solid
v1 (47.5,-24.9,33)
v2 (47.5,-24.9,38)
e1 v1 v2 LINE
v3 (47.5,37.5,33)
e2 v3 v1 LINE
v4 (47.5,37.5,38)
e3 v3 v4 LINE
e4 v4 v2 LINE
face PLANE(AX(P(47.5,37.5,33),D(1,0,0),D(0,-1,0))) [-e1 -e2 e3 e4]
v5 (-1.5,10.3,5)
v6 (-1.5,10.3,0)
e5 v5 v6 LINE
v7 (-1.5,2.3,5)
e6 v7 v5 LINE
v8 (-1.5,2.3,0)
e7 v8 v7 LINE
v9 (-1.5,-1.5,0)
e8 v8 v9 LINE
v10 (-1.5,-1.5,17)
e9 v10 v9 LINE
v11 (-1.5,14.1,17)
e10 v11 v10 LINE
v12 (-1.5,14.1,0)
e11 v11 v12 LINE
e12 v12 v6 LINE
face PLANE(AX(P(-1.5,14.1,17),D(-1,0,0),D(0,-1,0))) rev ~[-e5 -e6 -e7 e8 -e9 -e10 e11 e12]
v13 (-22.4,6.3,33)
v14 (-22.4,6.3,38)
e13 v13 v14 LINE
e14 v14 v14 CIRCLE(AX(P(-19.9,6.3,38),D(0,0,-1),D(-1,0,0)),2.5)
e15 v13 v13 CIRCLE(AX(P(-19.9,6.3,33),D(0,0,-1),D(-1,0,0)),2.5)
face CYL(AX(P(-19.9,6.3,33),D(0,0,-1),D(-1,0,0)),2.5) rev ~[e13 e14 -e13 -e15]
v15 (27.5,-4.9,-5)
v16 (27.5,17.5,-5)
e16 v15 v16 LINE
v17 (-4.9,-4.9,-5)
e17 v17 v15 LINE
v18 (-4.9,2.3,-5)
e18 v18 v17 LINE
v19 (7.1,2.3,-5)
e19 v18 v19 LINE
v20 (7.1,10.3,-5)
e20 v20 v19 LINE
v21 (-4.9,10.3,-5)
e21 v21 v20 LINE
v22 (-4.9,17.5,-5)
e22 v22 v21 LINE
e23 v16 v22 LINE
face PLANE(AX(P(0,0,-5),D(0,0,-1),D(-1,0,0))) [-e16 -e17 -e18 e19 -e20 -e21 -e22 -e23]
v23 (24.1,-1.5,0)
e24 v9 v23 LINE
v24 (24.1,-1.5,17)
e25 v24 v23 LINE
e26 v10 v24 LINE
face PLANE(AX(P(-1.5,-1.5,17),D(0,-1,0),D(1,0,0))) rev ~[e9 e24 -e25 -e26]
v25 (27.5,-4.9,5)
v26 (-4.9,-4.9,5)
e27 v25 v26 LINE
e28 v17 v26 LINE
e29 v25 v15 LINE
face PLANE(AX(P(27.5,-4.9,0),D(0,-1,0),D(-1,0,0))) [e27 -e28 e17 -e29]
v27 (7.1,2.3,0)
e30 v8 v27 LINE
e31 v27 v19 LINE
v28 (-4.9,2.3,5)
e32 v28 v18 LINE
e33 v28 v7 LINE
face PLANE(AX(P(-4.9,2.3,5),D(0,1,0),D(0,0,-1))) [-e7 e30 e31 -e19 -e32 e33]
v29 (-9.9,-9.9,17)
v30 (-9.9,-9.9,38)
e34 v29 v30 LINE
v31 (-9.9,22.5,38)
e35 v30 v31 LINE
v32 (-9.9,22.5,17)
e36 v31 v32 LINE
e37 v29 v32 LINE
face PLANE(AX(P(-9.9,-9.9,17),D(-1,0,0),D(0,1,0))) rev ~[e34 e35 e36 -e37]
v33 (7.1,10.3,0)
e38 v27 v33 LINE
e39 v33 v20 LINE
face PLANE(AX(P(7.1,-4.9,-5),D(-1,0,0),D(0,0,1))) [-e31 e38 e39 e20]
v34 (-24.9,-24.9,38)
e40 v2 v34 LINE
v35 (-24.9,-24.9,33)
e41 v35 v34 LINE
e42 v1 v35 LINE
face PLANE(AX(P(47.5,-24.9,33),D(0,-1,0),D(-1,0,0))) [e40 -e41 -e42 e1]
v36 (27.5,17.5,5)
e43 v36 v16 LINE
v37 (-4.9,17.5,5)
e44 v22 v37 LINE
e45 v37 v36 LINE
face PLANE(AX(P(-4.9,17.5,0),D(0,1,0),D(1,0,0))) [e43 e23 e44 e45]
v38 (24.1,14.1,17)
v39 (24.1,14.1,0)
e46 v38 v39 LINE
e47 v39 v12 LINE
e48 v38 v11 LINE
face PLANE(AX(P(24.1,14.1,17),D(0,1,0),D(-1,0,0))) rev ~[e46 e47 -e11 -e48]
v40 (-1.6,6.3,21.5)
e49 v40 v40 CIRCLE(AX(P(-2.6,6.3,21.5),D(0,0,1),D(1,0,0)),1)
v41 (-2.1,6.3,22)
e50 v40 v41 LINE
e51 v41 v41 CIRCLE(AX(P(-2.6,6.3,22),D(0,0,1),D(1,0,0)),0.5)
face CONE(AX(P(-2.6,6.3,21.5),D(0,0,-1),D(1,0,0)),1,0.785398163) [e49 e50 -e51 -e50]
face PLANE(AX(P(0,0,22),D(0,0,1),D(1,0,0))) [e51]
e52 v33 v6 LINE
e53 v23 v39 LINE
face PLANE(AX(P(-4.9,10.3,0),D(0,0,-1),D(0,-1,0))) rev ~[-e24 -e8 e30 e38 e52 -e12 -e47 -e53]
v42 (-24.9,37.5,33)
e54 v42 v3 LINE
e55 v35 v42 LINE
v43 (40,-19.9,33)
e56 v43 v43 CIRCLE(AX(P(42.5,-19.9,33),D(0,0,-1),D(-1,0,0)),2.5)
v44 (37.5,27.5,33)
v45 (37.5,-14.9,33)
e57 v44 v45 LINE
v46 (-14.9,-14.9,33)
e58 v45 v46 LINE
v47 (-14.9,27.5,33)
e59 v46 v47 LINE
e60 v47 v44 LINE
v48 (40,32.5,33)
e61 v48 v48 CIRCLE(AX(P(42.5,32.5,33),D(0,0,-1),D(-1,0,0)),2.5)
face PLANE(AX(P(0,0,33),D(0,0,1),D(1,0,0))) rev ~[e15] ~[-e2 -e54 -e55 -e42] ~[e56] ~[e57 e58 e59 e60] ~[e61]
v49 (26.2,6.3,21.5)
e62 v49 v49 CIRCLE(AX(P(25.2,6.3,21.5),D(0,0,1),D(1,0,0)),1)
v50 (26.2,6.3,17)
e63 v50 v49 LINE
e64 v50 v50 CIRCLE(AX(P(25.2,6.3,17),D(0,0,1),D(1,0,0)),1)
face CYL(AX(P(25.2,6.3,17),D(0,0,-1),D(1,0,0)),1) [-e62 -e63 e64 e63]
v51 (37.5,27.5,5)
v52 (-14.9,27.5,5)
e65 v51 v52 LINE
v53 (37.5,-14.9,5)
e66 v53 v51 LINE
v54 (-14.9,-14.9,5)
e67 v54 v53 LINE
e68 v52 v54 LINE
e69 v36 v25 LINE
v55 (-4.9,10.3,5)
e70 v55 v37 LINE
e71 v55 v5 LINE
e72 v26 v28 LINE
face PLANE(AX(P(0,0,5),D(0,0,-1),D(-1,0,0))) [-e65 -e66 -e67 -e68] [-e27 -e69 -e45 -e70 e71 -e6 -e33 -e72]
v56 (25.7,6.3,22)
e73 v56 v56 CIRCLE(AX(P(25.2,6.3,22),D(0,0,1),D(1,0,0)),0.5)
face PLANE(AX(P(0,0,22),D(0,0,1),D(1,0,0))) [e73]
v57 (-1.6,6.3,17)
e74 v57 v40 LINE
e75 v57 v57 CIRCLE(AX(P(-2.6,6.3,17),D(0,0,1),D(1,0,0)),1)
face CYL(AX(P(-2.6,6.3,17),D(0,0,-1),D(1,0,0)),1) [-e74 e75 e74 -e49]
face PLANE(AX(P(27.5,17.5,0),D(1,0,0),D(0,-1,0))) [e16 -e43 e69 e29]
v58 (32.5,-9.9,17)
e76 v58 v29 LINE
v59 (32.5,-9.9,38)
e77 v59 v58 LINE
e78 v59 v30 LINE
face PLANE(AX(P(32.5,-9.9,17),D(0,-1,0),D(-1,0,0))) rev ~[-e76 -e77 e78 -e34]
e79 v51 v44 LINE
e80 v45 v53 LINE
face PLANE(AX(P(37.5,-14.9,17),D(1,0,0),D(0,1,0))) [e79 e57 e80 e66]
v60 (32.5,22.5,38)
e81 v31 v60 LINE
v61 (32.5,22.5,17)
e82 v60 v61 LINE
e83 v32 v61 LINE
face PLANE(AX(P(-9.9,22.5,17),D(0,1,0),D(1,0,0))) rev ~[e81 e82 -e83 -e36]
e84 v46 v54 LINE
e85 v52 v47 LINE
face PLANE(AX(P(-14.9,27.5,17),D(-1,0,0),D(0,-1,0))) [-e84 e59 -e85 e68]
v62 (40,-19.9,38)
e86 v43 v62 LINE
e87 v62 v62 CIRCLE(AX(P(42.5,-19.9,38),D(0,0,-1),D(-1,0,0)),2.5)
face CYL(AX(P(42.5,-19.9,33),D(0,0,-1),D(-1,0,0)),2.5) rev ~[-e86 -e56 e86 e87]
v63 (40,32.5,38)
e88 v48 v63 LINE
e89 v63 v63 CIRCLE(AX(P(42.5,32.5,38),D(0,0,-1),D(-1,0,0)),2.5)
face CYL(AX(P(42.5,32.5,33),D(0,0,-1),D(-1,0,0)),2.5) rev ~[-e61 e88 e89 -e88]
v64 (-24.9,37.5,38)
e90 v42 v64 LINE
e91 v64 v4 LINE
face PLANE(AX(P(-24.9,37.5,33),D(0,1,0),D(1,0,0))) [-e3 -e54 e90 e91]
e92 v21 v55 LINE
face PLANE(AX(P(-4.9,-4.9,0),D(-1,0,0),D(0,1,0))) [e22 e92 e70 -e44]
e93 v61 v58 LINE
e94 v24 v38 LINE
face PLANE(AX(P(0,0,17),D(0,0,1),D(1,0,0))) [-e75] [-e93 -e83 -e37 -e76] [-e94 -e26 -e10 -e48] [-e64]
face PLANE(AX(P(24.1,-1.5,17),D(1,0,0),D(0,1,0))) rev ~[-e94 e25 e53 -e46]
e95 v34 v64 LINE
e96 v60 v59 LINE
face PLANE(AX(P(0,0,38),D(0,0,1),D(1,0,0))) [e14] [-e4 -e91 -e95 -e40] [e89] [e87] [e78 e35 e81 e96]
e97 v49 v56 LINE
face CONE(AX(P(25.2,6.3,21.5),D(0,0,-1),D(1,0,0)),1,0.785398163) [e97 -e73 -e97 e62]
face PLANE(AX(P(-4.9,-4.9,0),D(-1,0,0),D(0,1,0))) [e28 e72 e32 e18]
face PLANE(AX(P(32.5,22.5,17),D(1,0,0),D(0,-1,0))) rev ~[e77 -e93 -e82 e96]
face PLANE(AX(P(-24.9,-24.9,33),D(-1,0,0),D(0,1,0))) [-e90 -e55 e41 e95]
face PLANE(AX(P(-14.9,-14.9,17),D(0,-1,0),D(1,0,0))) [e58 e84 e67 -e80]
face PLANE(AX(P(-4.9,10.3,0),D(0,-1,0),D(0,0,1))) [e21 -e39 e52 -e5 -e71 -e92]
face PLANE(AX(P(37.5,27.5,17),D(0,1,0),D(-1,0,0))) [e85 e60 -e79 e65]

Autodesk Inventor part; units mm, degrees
ref_plane "YZ Plane" through (0, 0, 0) normal (1, 0, 0) x (0, 1, 0)
ref_plane "XZ Plane" through (0, 0, 0) normal (0, 1, 0) x (-1, 0, 0)
sketch "Sketch1" plane through (0, 0, 0) normal (0, 0, 1) x (1, 0, 0)
  line L0 (0, 0) -> (22.6, 0)
  line L1 (22.6, 0) -> (22.6, 12.6)
  line L2 (22.6, 12.6) -> (0, 12.6)
  line L3 (0, 12.6) -> (0, 0)
  line L4 (-4.9, 17.5) -> (27.5, 17.5)
  line L5 (27.5, 17.5) -> (27.5, -4.9)
  line L6 (27.5, -4.9) -> (-4.9, -4.9)
  line L7 (-4.9, -4.9) -> (-4.9, 17.5)
  dimension "d0" = 22.6
  dimension "d1" = 12.6
  dimension "d2" = 4.9
extrude "Extrusion1" add sketch "Sketch1" along normal blind 17
sketch "Sketch2" plane through (0, 0, 0) normal (0, 0, -1) x (-1, 0, 0)
  line L0 (4.9, -4.9) -> (-27.5, -4.9) projected
  line L1 (-27.5, -4.9) -> (-27.5, 17.5) projected
  line L2 (-27.5, 17.5) -> (4.9, 17.5) projected
  line L3 (4.9, 17.5) -> (4.9, -4.9) projected
  point P0 (0, 0)
extrude "Extrusion2" add sketch "Sketch2" along normal blind 5
sketch "Sketch3" plane through (0, 0, 17) normal (0, 0, 1) x (1, 0, 0)
  line L0 (-4.9, -4.9) -> (27.5, -4.9) projected
  line L1 (27.5, -4.9) -> (27.5, 17.5) projected
  line L2 (27.5, 17.5) -> (-4.9, 17.5) projected
  line L3 (-4.9, 17.5) -> (-4.9, -4.9) projected
  line L4 (0, 0) -> (0, 12.6) projected
  line L5 (0, 12.6) -> (22.6, 12.6) projected
  line L6 (22.6, 12.6) -> (22.6, 0) projected
  line L7 (22.6, 0) -> (0, 0) projected
  line L8 (-9.9, -9.9) -> (32.5, -9.9)
  line L9 (32.5, -9.9) -> (32.5, 22.5)
  line L10 (32.5, 22.5) -> (-9.9, 22.5)
  line L11 (-9.9, 22.5) -> (-9.9, -9.9)
  line L12 (-4.9, 6.3) -> (-2.6, 6.3) construction
  line L13 (27.5, 17.5) -> (27.5, -4.9) projected
  line L14 (27.5, 6.3) -> (25.2, 6.3) construction
  circle A0 centre (-2.6, 6.3) radius 1
  circle A1 centre (25.2, 6.3) radius 1
  dimension "d7" = 5
  dimension "d10" = 2.3
  dimension "d11" = 2.3
  dimension "d12" = 2
  dimension "d13" = 2
extrude "Extrusion4" add sketch "Sketch3" along normal blind 5 contours A0 | A1
chamfer "Chamfer1" distance 0.5 angle 45 2 edges at (-3.6, 6.3, 22) (24.2, 6.3, 22)
ref_plane "Work Plane1" through (0, 0, 12) normal (0, 0, 1) x (1, 0, 0)
sketch "Sketch5" plane through (0, 0, 12) normal (0, 0, 1) x (1, 0, 0)
  line L0 (-4.9, -4.9) -> (27.5, -4.9) projected
  line L1 (27.5, -4.9) -> (27.5, 17.5) projected
  line L2 (27.5, 17.5) -> (-4.9, 17.5) projected
  line L3 (-4.9, 17.5) -> (-4.9, -4.9) projected
  line L4 (32.5, -9.9) -> (-9.9, -9.9)
  line L5 (-9.9, -9.9) -> (-9.9, 22.5)
  line L6 (-9.9, 22.5) -> (32.5, 22.5)
  line L7 (32.5, 22.5) -> (32.5, -9.9)
  point P0 (0, 0)
  dimension "d21" = 5
extrude "Extrusion5" add sketch "Sketch5" along normal blind 5
sketch "Sketch14" plane through (0, 0, 17) normal (0, 0, 1) x (1, 0, 0)
  line L0 (22.6, 12.6) -> (22.6, 0) projected
  line L1 (0, 12.6) -> (22.6, 12.6) projected
  line L2 (0, 0) -> (0, 12.6) projected
  line L3 (22.6, 0) -> (0, 0) projected
  line L4 (-9.9, -9.9) -> (-9.9, 22.5)
  line L5 (-9.9, 22.5) -> (32.5, 22.5)
  line L6 (32.5, 22.5) -> (32.5, -9.9)
  line L7 (32.5, -9.9) -> (-9.9, -9.9)
  line L8 (-14.9, -14.9) -> (-14.9, 27.5)
  line L9 (-14.9, 27.5) -> (37.5, 27.5)
  line L10 (37.5, 27.5) -> (37.5, -14.9)
  line L11 (37.5, -14.9) -> (-14.9, -14.9)
  dimension "d52" = 9.9
  dimension "d53" = 5
extrude "Extrusion11" add sketch "Sketch14" along normal blind 16 contours L8 L9 L10 L11
sketch "Sketch15" plane through (0, 0, 33) normal (0, 0, 1) x (1, 0, 0)
  line L0 (-14.9, 27.5) -> (-14.9, -14.9) projected
  line L1 (-14.9, -14.9) -> (37.5, -14.9) projected
  line L2 (37.5, -14.9) -> (37.5, 27.5) projected
  line L3 (37.5, 27.5) -> (-14.9, 27.5) projected
  line L4 (47.5, -24.9) -> (-24.9, -24.9)
  line L5 (-24.9, -24.9) -> (-24.9, 37.5)
  line L6 (-24.9, 37.5) -> (47.5, 37.5)
  line L7 (47.5, 37.5) -> (47.5, -24.9)
  line L8 (32.5, -9.9) -> (-9.9, -9.9) projected
  line L9 (-9.9, -9.9) -> (-9.9, 22.5) projected
  line L10 (-9.9, 22.5) -> (32.5, 22.5) projected
  line L11 (32.5, 22.5) -> (32.5, -9.9) projected
  point P0 (0, 0)
  dimension "d56" = 10
extrude "Extrusion12" add sketch "Sketch15" along normal blind 5 contours L3 L2 L1 L0 | L4 L5 L6 L7
sketch "Sketch16" plane through (0, 0, 33) normal (0, 0, -1) x (-1, 0, 0)
  line L0 (-37.5, -14.9) -> (-37.5, 27.5) projected
  line L1 (14.9, -14.9) -> (-37.5, -14.9) projected
  line L2 (14.9, 27.5) -> (14.9, -14.9) projected
  line L3 (-37.5, 27.5) -> (14.9, 27.5) projected
  line L4 (9.9, 22.5) -> (9.9, -9.9) projected
  line L5 (9.9, -9.9) -> (-32.5, -9.9) projected
  line L6 (-32.5, -9.9) -> (-32.5, 22.5) projected
  line L7 (-32.5, 22.5) -> (9.9, 22.5) projected
  line L8 (-42.5, 32.5) -> (-42.5, -19.9) construction
  line L9 (-42.5, -19.9) -> (19.9, -19.9) construction
  line L10 (19.9, -19.9) -> (19.9, 32.5) construction
  line L11 (19.9, 32.5) -> (-42.5, 32.5) construction
  circle A0 centre (19.9, 6.3) radius 2.5
  circle A1 centre (-42.5, 32.5) radius 2.5
  circle A2 centre (-42.5, -19.9) radius 2.5
  point P0 (0, 0)
  dimension "d59" = 5
  dimension "d60" = 5
  dimension "d61" = 5
  dimension "d62" = 5
extrude "Extrusion13" cut sketch "Sketch16" against normal blind 5 contours A0 | A1 | A2
sketch "Sketch17" plane through (-4.9, -4.9, -5) normal (-1, 0, 0) x (0, 0, 1)
  line L0 (-10, 15.2) -> (10, 15.2)
  line L1 (10, 15.2) -> (10, 7.2)
  line L2 (10, 7.2) -> (-10, 7.2)
  line L3 (-10, 7.2) -> (-10, 15.2)
  line L4 (0, 22.4) -> (0, 0) projected
  line L5 (-10, 15.2) -> (10, 7.2) construction
  line L6 (10, 15.2) -> (-10, 7.2) construction
  line L7 (5, 15.2) -> (5, 7.2)
  line L8 (0, 11.2) -> (5, 11.2)
  point P0 (5, 4.9)
  dimension "d65" = 20
  dimension "d66" = 8
  dimension "d67" = 5
extrude "Extrusion14" cut sketch "Sketch17" against normal blind 5 contours L0 L1 L2 L7
sketch "Sketch18" plane through (0, 0, 12) normal (0, 0, -1) x (-1, 0, 0)
  line L0 (-32.5, 22.5) -> (9.9, 22.5) projected
  line L1 (-32.5, -9.9) -> (-32.5, 22.5) projected
  line L2 (9.9, -9.9) -> (-32.5, -9.9) projected
  line L3 (9.9, 22.5) -> (9.9, -9.9) projected
  line L4 (4.9, -4.9) -> (4.9, 17.5) projected
  line L5 (-27.5, -4.9) -> (4.9, -4.9) projected
  line L6 (-27.5, 17.5) -> (-27.5, -4.9) projected
  line L7 (4.9, 17.5) -> (-27.5, 17.5) projected
  point P0 (0, 0)
extrude "Extrusion15" add sketch "Sketch18" along normal blind 7
sketch "Sketch20" plane through (-4.9, -4.9, -5) normal (-1, 0, 0) x (0, 0, 1)
  line L0 (5, 7.2) -> (0, 7.2)
  line L1 (5, 15.2) -> (10, 15.2) projected
  line L2 (5, 15.2) -> (0, 15.2)
  line L3 (0, 15.2) -> (0, 7.2)
  line L4 (5, 15.2) -> (5, 17.5) projected
  line L5 (5, 7.2) -> (5, 15.2)
  point P0 (5, 4.9)
  dimension "d74" = 10
extrude "Extrusion17" cut sketch "Sketch20" against normal blind 12
sketch "Sketch21" plane through (0, 0, 17) normal (0, 0, -1) x (-1, 0, 0)
  line L0 (-32.5, -9.9) -> (9.9, -9.9) projected
  line L1 (9.9, -9.9) -> (9.9, 22.5) projected
  line L2 (9.9, 22.5) -> (-32.5, 22.5) projected
  line L3 (-32.5, 22.5) -> (-32.5, -9.9) projected
  line L4 (0, 2.3) -> (0, 10.3) projected
  line L5 (4.9, 2.3) -> (0, 2.3) projected
  line L6 (4.9, -4.9) -> (4.9, 2.3) projected
  line L7 (-27.5, -4.9) -> (4.9, -4.9) projected
  line L8 (-27.5, 17.5) -> (-27.5, -4.9) projected
  line L9 (4.9, 17.5) -> (-27.5, 17.5) projected
  line L10 (4.9, 10.3) -> (4.9, 17.5) projected
  line L11 (4.9, 10.3) -> (0, 10.3) projected
  line L12 (-37.5, -14.9) -> (-37.5, 27.5) projected
  line L13 (14.9, -14.9) -> (-37.5, -14.9) projected
  line L14 (14.9, 27.5) -> (14.9, -14.9) projected
  line L15 (-37.5, 27.5) -> (14.9, 27.5) projected
  line L16 (9.9, 22.5) -> (9.9, -9.9) projected
  line L17 (9.9, -9.9) -> (-32.5, -9.9) projected
  line L18 (-32.5, -9.9) -> (-32.5, 22.5) projected
  line L19 (-32.5, 22.5) -> (9.9, 22.5) projected
  point P0 (0, 0)
extrude "Extrusion18" add sketch "Sketch21" along normal blind 12 contours L12 L15 L14 L13
sketch "Sketch22" plane through (0, 0, 17) normal (0, 0, 1) x (1, 0, 0)
  line L0 (0, 12.6) -> (22.6, 12.6) projected
  line L1 (22.6, 12.6) -> (22.6, 0) projected
  line L2 (22.6, 0) -> (0, 0) projected
  line L3 (0, 0) -> (0, 12.6) projected
  line L4 (24.1, 14.1) -> (-1.5, 14.1)
  line L5 (-1.5, 14.1) -> (-1.5, -1.5)
  line L6 (-1.5, -1.5) -> (24.1, -1.5)
  line L7 (24.1, -1.5) -> (24.1, 14.1)
  dimension "d79" = 1.5
extrude "Extrusion19" cut sketch "Sketch22" against normal blind 17
sketch "Sketch23" plane through (0, 0, 38) normal (0, 0, 1) x (1, 0, 0)
  circle A0 centre (-19.9, 6.3) radius 2.5 projected
  circle A1 centre (42.5, 32.5) radius 2.5 projected
  circle A2 centre (42.5, -19.9) radius 2.5 projected
  line L0 (47.5, 37.5) -> (-24.9, 37.5) projected
  line L1 (-24.9, 37.5) -> (-24.9, -24.9) projected
  line L2 (-24.9, -24.9) -> (47.5, -24.9) projected
  line L3 (47.5, -24.9) -> (47.5, 37.5) projected
  line L4 (32.5, -9.9) -> (-9.9, -9.9) projected
  line L5 (-9.9, -9.9) -> (-9.9, 22.5) projected
  line L6 (-9.9, 22.5) -> (32.5, 22.5) projected
  line L7 (32.5, 22.5) -> (32.5, -9.9) projected
  point P0 (0, 0)
equation "\"d63\" = d62"
equation "\"d68\" = d62"
properties part number "servo_holder_V2_3DPrint"
